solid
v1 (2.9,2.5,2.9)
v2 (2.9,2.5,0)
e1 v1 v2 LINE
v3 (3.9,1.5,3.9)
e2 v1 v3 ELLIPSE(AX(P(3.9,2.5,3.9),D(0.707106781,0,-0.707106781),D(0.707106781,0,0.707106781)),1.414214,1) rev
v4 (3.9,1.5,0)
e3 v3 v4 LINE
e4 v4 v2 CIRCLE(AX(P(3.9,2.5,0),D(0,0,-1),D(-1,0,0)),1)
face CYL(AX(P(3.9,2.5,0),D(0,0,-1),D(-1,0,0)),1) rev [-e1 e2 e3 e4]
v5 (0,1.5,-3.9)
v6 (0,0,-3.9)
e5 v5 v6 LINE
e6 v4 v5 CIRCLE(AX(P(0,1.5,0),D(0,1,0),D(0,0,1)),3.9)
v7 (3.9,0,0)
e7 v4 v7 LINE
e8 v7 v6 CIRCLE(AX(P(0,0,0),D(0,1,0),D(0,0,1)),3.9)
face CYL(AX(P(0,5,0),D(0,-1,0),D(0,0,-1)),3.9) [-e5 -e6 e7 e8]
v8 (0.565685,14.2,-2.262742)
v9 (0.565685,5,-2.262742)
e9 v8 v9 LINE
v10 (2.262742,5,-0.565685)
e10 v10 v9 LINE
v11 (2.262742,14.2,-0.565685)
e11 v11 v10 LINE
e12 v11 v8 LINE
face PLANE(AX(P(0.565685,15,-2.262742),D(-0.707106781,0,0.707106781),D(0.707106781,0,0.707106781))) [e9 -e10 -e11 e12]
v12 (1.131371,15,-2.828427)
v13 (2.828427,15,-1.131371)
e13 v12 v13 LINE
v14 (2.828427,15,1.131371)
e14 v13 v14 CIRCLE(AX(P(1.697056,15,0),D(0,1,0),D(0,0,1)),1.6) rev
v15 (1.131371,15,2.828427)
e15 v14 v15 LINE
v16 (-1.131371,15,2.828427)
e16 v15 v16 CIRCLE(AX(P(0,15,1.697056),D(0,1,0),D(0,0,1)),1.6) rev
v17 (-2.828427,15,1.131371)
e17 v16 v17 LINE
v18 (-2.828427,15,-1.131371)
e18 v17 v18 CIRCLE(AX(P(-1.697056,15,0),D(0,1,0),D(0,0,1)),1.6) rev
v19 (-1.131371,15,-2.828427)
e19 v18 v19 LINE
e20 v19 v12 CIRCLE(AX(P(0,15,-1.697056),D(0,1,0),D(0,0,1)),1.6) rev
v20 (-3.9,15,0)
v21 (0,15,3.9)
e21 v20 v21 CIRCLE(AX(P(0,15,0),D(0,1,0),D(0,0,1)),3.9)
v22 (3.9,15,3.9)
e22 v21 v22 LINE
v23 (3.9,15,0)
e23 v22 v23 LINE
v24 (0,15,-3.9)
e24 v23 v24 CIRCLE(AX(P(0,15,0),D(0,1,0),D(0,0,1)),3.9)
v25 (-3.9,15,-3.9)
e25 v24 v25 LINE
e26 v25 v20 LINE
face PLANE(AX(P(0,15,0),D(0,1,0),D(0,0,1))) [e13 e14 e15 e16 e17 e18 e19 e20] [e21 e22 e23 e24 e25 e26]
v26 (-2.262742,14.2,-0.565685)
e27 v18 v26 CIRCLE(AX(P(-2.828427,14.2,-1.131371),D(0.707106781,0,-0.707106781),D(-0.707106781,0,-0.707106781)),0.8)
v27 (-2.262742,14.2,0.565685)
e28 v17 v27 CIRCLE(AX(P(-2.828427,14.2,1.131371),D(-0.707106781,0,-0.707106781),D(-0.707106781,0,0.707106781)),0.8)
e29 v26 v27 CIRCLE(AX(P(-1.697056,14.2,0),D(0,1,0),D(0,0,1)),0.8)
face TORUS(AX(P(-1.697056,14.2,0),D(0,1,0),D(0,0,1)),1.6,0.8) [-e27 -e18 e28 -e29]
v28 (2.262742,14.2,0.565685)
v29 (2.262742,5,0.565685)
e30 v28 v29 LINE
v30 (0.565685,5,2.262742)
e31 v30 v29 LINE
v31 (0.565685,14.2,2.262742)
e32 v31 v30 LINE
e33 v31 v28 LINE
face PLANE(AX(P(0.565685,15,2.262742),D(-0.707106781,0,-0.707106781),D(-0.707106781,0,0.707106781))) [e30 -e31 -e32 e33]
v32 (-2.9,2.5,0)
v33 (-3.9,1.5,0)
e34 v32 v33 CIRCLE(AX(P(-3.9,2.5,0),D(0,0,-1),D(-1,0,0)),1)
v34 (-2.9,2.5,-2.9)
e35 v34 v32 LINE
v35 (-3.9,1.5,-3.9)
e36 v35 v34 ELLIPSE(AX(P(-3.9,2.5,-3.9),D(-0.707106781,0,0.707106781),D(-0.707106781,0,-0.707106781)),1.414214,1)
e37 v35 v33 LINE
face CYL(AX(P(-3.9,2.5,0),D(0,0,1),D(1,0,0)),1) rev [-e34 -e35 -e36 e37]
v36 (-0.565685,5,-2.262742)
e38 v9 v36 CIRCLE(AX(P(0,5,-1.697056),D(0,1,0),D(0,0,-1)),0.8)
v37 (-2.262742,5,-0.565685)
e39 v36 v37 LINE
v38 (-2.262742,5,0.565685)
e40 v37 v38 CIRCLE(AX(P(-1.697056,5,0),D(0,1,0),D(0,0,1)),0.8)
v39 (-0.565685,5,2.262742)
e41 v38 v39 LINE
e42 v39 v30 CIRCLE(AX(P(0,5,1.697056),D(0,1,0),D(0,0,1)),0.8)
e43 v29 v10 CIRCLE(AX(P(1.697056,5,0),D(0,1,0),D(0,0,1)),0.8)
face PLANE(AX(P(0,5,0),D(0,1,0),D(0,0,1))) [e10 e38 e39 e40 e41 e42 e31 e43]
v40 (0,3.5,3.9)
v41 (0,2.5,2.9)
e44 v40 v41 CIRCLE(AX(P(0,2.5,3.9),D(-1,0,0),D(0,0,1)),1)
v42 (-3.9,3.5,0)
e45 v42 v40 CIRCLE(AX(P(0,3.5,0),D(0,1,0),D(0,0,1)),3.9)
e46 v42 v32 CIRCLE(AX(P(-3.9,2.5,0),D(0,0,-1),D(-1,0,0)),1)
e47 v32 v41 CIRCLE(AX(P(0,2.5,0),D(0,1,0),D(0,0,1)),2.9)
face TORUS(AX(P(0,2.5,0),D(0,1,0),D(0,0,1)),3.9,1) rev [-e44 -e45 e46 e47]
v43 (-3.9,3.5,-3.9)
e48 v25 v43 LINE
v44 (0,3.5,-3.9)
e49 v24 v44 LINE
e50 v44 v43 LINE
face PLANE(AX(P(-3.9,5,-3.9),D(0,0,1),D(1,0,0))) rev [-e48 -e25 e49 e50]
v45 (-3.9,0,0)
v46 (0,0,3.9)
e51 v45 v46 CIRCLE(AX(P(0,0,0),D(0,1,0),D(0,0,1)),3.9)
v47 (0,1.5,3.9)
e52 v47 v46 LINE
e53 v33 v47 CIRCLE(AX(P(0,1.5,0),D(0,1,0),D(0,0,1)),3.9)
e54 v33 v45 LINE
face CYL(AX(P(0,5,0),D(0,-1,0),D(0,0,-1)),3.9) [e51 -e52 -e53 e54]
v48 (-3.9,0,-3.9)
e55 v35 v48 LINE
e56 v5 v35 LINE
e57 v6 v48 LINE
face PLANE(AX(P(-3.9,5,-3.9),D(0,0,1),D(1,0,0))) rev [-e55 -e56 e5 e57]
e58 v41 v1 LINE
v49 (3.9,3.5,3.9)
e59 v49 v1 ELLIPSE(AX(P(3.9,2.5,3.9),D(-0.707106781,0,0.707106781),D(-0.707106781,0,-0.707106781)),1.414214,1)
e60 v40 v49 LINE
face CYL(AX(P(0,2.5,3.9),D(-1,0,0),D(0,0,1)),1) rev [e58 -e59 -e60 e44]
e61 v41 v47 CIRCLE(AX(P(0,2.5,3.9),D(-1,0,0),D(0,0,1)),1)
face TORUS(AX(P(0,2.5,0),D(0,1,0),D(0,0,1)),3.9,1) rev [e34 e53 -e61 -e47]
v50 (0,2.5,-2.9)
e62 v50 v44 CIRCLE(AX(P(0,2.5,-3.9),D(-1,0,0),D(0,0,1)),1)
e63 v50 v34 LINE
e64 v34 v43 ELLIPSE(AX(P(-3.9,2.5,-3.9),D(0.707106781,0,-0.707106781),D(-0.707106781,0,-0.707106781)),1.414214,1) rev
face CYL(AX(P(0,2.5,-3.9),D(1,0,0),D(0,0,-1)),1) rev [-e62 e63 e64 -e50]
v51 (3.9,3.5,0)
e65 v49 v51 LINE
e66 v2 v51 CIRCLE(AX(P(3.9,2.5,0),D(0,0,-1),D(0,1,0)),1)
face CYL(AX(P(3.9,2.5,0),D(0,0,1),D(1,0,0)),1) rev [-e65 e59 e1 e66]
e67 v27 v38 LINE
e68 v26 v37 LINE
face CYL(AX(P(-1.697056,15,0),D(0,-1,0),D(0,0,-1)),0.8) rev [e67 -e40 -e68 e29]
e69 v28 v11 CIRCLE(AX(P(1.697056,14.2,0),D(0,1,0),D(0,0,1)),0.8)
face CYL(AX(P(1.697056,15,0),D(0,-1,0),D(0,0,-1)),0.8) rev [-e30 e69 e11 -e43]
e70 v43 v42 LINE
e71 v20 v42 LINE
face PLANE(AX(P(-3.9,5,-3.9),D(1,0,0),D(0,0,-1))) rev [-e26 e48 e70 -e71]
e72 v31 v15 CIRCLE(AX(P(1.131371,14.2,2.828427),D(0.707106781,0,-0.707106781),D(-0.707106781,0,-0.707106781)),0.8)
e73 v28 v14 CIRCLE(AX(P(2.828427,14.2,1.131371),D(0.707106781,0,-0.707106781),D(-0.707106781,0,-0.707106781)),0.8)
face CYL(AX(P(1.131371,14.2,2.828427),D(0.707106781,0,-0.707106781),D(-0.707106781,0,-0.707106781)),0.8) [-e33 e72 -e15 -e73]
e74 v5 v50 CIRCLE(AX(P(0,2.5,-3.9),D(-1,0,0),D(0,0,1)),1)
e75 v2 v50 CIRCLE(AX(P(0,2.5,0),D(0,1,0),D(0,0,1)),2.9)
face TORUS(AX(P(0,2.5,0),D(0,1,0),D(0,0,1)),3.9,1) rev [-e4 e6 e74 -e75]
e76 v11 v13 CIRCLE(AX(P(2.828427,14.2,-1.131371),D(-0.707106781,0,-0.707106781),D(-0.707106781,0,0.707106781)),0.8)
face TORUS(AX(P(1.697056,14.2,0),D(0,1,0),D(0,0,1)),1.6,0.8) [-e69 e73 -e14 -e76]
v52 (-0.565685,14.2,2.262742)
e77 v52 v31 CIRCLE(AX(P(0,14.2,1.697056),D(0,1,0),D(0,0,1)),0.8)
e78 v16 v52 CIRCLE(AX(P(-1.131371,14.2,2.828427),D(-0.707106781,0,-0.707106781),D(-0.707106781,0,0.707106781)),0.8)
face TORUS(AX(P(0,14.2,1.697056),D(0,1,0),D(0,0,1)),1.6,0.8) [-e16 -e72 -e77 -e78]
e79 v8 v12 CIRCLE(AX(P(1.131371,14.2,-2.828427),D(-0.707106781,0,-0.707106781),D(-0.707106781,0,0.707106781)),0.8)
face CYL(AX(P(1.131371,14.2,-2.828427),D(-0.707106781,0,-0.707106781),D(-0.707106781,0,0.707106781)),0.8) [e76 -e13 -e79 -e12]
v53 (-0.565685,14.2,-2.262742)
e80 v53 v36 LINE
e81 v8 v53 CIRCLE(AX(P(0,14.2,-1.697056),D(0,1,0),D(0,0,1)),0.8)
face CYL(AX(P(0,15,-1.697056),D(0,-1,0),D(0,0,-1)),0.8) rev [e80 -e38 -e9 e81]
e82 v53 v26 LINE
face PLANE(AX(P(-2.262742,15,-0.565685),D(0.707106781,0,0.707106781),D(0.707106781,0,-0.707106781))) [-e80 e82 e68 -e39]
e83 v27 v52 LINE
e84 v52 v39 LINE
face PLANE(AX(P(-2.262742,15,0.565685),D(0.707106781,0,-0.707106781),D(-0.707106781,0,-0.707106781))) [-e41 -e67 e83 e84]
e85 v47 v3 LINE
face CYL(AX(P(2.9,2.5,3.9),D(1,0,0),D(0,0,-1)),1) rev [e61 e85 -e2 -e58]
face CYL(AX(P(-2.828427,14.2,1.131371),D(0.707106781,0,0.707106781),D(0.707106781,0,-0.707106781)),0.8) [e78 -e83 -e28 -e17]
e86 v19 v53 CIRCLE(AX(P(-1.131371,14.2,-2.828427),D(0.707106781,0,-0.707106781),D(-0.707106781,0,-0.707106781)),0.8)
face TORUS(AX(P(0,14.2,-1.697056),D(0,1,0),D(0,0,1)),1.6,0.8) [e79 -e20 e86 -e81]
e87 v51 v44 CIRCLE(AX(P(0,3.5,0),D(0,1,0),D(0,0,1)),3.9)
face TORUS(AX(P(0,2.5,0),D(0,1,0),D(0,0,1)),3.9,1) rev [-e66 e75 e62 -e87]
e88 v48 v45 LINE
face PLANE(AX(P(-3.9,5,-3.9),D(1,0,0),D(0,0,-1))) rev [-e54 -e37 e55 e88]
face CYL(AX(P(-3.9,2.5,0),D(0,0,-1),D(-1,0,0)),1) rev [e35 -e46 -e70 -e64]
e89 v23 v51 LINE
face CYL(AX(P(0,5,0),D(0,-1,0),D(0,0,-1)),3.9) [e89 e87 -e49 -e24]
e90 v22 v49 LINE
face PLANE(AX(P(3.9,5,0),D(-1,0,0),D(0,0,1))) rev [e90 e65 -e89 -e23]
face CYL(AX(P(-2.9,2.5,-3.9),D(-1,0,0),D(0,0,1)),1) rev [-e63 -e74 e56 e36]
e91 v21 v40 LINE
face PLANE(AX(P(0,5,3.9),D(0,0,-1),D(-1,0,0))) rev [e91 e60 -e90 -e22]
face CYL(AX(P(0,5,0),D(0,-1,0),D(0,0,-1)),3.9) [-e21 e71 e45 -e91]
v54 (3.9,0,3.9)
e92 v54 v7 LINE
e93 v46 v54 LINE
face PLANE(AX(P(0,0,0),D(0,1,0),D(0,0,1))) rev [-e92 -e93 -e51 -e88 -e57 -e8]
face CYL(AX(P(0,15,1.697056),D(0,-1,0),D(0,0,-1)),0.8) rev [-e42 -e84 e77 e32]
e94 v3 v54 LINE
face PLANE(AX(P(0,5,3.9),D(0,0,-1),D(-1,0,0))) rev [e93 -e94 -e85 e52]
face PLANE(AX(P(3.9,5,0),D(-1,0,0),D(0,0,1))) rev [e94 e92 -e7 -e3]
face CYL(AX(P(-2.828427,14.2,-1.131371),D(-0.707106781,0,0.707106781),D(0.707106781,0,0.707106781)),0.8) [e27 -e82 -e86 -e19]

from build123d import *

# Parameters (mm, degrees)
BOSS_EXTRUDE1_DEPTH     = 5
CUT_EXTRUDE2_DEPTH      = 1
CUT_EXTRUDE2_DEPTH_BACK = 1
FILLET1_R               = 1
BOSS_EXTRUDE3_DEPTH     = 10
FILLET2_R               = 0.8


with BuildPart() as part:
    # Sketch1 → Boss-Extrude1 (new body)
    with BuildSketch(Plane(origin=(0, 0, 0), x_dir=(1, 0, 0), z_dir=(0, 1, 0))):
        with BuildLine():
            Line((-3.9, 3.9), (0, 3.9))
            ThreePointArc((0, 3.9), (2.757716447, 2.757716447), (3.9, 0))
            Line((3.9, 0), (3.9, -3.9))
            Line((3.9, -3.9), (0, -3.9))
            ThreePointArc((0, -3.9), (-2.757716447, -2.757716447), (-3.9, 0))
            Line((-3.9, 0), (-3.9, 3.9))
        make_face()
    extrude(amount=BOSS_EXTRUDE1_DEPTH)

    # Sketch3 → Cut-Extrude2 (cut, two sides: drawn at the far end of the back side and taken through both)
    with BuildSketch(Plane(origin=(0, 2.5, 0), x_dir=(1, 0, 0), z_dir=(0, 1, 0)).offset(-CUT_EXTRUDE2_DEPTH_BACK)):
        with BuildLine():
            Line((-3.9, 0), (-3.9, 3.9))
            Line((-3.9, 3.9), (0, 3.9))
            ThreePointArc((0, 3.9), (2.757716447, 2.757716447), (3.9, 0))
            Line((3.9, 0), (3.9, -3.9))
            Line((3.9, -3.9), (0, -3.9))
            ThreePointArc((0, -3.9), (-2.757716447, -2.757716447), (-3.9, 0))
        make_face()
        with BuildLine():
            Line((-2.9, 0), (-2.9, 2.9))
            Line((-2.9, 2.9), (0, 2.9))
            ThreePointArc((0, 2.9), (2.050609665, 2.050609665), (2.9, 0))
            Line((2.9, 0), (2.9, -2.9))
            Line((2.9, -2.9), (0, -2.9))
            ThreePointArc((0, -2.9), (-2.050609665, -2.050609665), (-2.9, 0))
        make_face(mode=Mode.SUBTRACT)
    extrude(amount=CUT_EXTRUDE2_DEPTH + CUT_EXTRUDE2_DEPTH_BACK, mode=Mode.SUBTRACT)

    # Fillet1
    fillet1_edges = [part.edges().sort_by_distance(p)[0] for p in [
        (2.9, 3.5, 1.45),
        (2.050609665, 3.5, -2.050609665),
        (1.45, 3.5, 2.9),
        (-2.050609665, 3.5, 2.050609665),
        (2.9, 1.5, 1.45),
        (2.050609665, 1.5, -2.050609665),
        (-2.9, 1.5, -1.45),
        (1.45, 1.5, 2.9),
        (-1.45, 3.5, -2.9),
        (-2.9, 3.5, -1.45),
        (-1.45, 1.5, -2.9),
        (-2.050609665, 1.5, 2.050609665),
    ]]
    fillet(fillet1_edges, radius=FILLET1_R - 0.0001)  # a hair under: the kernel refuses the full size

    # Sketch4 → Boss-Extrude3 (add)
    with BuildSketch(Plane(origin=(0, 5, 0), x_dir=(1, 0, 0), z_dir=(0, 1, 0))):
        with BuildLine():
            Line((0, 3.9), (-3.9, 3.9))
            Line((-3.9, 3.9), (-3.9, 0))
            ThreePointArc((-3.9, 0), (-2.757716447, -2.757716447), (0, -3.9))
            Line((0, -3.9), (3.9, -3.9))
            Line((3.9, -3.9), (3.9, 0))
            ThreePointArc((3.9, 0), (2.757716447, 2.757716447), (0, 3.9))
        make_face()
        with BuildLine():
            Line((-2.2627417, -0.565685425), (-0.565685425, -2.2627417))
            ThreePointArc((-0.565685425, -2.2627417), (0, -2.497056275), (0.565685425, -2.2627417))
            Line((0.565685425, -2.2627417), (2.2627417, -0.565685425))
            ThreePointArc((2.2627417, -0.565685425), (2.497056275, 0), (2.2627417, 0.565685425))
            Line((2.2627417, 0.565685425), (0.565685425, 2.2627417))
            ThreePointArc((0.565685425, 2.2627417), (0, 2.497056275), (-0.565685425, 2.2627417))
            Line((-0.565685425, 2.2627417), (-2.2627417, 0.565685425))
            ThreePointArc((-2.2627417, 0.565685425), (-2.497056275, 0), (-2.2627417, -0.565685425))
        make_face(mode=Mode.SUBTRACT)
    extrude(amount=BOSS_EXTRUDE3_DEPTH)

    # Fillet2
    fillet2_edges = [part.edges().sort_by_distance(p)[0] for p in [
        (0, 15, 2.497056275),
        (1.414213562, 15, 1.414213562),
        (2.497056275, 15, 0),
        (1.414213562, 15, -1.414213562),
        (0, 15, -2.497056275),
        (-1.414213562, 15, -1.414213562),
        (-2.497056275, 15, 0),
        (-1.414213562, 15, 1.414213562),
    ]]
    fillet(fillet2_edges, radius=FILLET2_R)


solid = part.part
